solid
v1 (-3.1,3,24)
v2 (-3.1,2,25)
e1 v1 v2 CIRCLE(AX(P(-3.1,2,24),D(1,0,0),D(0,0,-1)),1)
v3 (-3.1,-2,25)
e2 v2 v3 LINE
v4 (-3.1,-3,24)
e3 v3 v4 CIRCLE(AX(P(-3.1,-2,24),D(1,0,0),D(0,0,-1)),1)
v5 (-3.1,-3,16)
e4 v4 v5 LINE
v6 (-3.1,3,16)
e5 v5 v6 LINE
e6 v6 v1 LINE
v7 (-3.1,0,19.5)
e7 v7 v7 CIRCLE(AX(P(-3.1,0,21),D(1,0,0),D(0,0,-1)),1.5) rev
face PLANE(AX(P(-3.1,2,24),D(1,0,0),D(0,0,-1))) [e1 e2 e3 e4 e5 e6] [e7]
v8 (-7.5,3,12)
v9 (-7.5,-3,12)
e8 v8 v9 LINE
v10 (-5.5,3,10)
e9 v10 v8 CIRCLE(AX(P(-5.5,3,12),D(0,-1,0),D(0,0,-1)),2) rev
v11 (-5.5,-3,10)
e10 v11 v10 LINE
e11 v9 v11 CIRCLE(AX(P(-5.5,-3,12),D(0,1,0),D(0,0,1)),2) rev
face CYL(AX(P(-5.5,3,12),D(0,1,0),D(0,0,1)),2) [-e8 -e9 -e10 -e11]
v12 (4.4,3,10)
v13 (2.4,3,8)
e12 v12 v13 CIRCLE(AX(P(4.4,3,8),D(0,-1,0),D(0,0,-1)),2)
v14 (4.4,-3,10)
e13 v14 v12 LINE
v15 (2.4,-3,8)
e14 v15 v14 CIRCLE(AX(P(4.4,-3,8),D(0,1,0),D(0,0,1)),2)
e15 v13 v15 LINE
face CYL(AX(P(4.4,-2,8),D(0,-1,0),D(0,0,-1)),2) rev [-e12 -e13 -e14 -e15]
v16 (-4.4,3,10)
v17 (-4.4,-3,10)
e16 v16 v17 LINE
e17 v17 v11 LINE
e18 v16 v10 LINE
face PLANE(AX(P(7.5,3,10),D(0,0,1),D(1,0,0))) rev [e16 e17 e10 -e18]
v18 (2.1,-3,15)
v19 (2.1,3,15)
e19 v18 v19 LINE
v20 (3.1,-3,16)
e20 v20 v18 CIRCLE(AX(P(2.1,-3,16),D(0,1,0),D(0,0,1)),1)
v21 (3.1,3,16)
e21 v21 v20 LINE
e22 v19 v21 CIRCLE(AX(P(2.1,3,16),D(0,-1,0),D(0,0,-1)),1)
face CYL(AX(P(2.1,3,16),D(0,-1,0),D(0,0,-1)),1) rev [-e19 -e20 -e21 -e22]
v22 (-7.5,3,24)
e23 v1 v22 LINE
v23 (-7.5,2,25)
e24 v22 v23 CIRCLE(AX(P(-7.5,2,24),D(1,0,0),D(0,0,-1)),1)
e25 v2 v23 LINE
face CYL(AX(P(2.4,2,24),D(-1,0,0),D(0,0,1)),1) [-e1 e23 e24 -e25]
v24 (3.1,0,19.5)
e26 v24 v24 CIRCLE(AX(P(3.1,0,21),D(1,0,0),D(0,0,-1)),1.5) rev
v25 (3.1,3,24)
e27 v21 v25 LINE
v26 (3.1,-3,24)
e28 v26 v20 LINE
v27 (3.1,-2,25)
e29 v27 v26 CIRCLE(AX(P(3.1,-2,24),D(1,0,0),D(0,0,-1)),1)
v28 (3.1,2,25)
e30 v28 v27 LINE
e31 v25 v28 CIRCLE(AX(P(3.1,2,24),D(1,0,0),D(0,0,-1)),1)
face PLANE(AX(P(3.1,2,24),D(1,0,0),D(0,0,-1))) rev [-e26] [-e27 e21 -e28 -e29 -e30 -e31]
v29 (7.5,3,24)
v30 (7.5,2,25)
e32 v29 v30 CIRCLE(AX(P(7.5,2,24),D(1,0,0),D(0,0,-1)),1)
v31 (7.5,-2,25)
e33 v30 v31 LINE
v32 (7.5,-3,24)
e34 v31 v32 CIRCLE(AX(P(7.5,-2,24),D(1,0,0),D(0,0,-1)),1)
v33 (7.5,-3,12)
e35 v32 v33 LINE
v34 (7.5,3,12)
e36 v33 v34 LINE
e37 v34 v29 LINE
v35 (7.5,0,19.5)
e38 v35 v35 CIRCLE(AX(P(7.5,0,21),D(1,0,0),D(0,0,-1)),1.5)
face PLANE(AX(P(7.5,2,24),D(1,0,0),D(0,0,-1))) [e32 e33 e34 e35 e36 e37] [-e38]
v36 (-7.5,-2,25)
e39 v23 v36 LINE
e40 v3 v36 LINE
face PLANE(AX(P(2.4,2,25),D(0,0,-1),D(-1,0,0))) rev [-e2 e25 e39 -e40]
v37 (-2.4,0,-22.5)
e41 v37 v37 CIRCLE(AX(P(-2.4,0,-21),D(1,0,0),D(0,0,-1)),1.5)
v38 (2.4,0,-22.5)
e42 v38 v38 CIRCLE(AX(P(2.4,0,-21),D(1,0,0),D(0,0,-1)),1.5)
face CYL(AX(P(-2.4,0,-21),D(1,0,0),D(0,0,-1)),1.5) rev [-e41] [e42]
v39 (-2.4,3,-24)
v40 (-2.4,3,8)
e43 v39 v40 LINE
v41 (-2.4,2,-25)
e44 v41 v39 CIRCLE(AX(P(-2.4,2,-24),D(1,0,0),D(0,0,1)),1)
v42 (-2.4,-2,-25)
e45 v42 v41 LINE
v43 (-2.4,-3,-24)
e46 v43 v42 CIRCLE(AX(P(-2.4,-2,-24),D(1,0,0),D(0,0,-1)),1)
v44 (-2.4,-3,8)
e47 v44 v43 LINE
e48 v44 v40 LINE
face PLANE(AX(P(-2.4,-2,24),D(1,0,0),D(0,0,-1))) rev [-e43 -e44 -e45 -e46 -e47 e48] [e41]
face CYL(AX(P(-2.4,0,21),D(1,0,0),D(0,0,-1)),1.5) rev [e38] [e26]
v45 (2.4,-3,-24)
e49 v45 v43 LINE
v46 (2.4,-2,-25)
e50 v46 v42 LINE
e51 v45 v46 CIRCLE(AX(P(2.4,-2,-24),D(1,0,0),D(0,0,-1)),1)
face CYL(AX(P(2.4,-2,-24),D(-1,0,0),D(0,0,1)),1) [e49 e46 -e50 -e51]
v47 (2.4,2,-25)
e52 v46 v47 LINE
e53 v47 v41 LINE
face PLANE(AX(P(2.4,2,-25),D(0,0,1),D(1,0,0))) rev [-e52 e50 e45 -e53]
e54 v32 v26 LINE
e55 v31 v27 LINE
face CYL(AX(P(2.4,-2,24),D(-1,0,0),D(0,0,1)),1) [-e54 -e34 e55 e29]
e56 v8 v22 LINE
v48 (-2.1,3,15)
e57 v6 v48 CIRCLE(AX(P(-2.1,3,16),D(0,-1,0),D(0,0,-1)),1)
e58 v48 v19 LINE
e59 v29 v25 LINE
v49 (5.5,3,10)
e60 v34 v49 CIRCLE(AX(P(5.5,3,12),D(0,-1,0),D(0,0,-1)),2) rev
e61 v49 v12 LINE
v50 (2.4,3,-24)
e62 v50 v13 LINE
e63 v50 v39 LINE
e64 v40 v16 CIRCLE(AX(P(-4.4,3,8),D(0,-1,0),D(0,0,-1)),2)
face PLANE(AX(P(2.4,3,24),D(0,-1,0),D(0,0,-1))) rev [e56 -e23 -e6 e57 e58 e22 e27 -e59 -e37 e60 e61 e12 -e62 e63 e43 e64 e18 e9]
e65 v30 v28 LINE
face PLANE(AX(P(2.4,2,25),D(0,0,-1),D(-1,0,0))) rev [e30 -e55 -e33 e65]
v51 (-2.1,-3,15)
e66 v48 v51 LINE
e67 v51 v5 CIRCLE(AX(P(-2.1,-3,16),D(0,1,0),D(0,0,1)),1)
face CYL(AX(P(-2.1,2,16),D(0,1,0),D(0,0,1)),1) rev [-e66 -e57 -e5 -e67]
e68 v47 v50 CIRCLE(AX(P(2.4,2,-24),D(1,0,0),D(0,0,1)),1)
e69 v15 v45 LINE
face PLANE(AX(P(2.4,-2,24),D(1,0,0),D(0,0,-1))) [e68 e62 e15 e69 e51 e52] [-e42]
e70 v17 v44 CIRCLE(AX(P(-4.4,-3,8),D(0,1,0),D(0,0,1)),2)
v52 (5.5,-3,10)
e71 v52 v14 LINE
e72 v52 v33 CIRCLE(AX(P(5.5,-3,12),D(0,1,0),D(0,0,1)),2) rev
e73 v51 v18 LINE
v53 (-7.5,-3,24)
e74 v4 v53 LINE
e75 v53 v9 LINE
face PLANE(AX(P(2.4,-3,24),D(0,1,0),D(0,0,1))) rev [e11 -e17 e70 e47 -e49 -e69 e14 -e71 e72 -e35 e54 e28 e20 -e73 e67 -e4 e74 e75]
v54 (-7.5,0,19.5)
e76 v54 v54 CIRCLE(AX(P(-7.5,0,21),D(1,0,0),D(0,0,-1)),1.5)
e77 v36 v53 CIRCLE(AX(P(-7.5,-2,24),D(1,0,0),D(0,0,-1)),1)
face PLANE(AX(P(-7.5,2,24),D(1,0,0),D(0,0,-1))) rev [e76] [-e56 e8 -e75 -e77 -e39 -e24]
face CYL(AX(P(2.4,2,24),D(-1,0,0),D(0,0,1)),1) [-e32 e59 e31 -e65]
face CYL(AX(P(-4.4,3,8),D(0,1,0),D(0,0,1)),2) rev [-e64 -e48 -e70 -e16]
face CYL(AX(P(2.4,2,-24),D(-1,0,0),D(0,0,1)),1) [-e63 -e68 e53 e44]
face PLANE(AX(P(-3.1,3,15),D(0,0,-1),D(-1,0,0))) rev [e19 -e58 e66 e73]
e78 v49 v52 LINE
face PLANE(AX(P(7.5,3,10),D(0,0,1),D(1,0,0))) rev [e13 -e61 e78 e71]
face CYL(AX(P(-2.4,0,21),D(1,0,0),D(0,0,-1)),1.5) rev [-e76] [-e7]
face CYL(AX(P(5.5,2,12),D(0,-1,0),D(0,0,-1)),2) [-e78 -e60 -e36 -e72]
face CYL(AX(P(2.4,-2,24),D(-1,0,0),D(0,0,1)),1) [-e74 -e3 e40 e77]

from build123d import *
from build123d.topology import SkipClean

# Parameters (mm, degrees)
SALIENTE_EXTRUIR1_DEPTH    = 2.4
CORTAR_EXTRUIR1_DEPTH      = 26.29347742
CORTAR_EXTRUIR1_DEPTH_BACK = 26.29347742
CROQUIS2_R                 = 1.5
CROQUIS3_R                 = 1.5
SALIENTE_EXTRUIR2_DEPTH    = 7.5
CORTAR_EXTRUIR2_DEPTH      = 3.1
REDONDEO1_R                = 2
REDONDEO2_R                = 1


with BuildPart() as part:
    # Croquis1 → Saliente-Extruir1 (new, symmetric)
    with BuildSketch(Plane(origin=(0, 0, 0), x_dir=(0, 0, -1), z_dir=(1, 0, 0))):
        with BuildLine():
            Line((-24, 3), (24, 3))
            ThreePointArc((24, 3), (24.707106781, 2.707106781), (25, 2))
            Line((25, 2), (25, -2))
            ThreePointArc((25, -2), (24.707106781, -2.707106781), (24, -3))
            Line((24, -3), (-24, -3))
            ThreePointArc((-24, -3), (-24.707106781, -2.707106781), (-25, -2))
            Line((-25, -2), (-25, 2))
            ThreePointArc((-25, 2), (-24.707106781, 2.707106781), (-24, 3))
        make_face()
    extrude(amount=SALIENTE_EXTRUIR1_DEPTH, both=True)

    # Croquis2 → Cortar-Extruir1 (cut, two sides: drawn at the far end of the back side and taken through both)
    with BuildSketch(Plane(origin=(0, 0, 0), x_dir=(0, 0, -1), z_dir=(1, 0, 0)).offset(-CORTAR_EXTRUIR1_DEPTH_BACK)):
        with Locations((-21, 0)):
            Circle(CROQUIS2_R)
        with Locations((21, 0)):
            Circle(CROQUIS2_R)
    extrude(amount=CORTAR_EXTRUIR1_DEPTH + CORTAR_EXTRUIR1_DEPTH_BACK, mode=Mode.SUBTRACT)

    # Croquis3 → Saliente-Extruir2 (add, symmetric)
    with SkipClean():  # the faces are left unmerged after this step: merging them gives an invalid solid
        with BuildSketch(Plane(origin=(0, 0, 0), x_dir=(0, 0, -1), z_dir=(1, 0, 0))):
            with BuildLine():
                Line((-25, 2), (-25, -2))
                ThreePointArc((-25, -2), (-24.707106781, -2.707106781), (-24, -3))
                Line((-24, -3), (-10, -3))
                Line((-10, -3), (-10, 3))
                Line((-10, 3), (-24, 3))
                ThreePointArc((-24, 3), (-24.707106781, 2.707106781), (-25, 2))
            make_face()
            with Locations((-21, 0)):
                Circle(CROQUIS3_R, mode=Mode.SUBTRACT)
        extrude(amount=SALIENTE_EXTRUIR2_DEPTH, both=True)
    add(part.part.scale(1), mode=Mode.REPLACE)  # the faces are merged on a copy

    # Croquis4 → Cortar-Extruir2 (cut, symmetric)
    with BuildSketch(Plane(origin=(0, 0, 0), x_dir=(0, 0, -1), z_dir=(1, 0, 0))):
        with BuildLine():
            Line((-24, 3), (-15, 3))
            Line((-15, 3), (-15, -3))
            Line((-15, -3), (-24, -3))
            ThreePointArc((-24, -3), (-24.707106781, -2.707106781), (-25, -2))
            Line((-25, -2), (-25, 2))
            ThreePointArc((-25, 2), (-24.707106781, 2.707106781), (-24, 3))
        make_face()
    extrude(amount=CORTAR_EXTRUIR2_DEPTH, both=True, mode=Mode.SUBTRACT)

    # Redondeo1
    redondeo1_edges = [part.edges().sort_by_distance(p)[0] for p in [
        (-2.4, 0, 10),
        (2.4, 0, 10),
        (-7.5, 0, 10),
        (7.5, 0, 10),
    ]]
    fillet(redondeo1_edges, radius=REDONDEO1_R)

    # Redondeo2
    redondeo2_edges = [part.edges().sort_by_distance(p)[0] for p in [
        (3.1, 0, 15),
        (-3.1, 0, 15),
    ]]
    fillet(redondeo2_edges, radius=REDONDEO2_R)


solid = part.part
